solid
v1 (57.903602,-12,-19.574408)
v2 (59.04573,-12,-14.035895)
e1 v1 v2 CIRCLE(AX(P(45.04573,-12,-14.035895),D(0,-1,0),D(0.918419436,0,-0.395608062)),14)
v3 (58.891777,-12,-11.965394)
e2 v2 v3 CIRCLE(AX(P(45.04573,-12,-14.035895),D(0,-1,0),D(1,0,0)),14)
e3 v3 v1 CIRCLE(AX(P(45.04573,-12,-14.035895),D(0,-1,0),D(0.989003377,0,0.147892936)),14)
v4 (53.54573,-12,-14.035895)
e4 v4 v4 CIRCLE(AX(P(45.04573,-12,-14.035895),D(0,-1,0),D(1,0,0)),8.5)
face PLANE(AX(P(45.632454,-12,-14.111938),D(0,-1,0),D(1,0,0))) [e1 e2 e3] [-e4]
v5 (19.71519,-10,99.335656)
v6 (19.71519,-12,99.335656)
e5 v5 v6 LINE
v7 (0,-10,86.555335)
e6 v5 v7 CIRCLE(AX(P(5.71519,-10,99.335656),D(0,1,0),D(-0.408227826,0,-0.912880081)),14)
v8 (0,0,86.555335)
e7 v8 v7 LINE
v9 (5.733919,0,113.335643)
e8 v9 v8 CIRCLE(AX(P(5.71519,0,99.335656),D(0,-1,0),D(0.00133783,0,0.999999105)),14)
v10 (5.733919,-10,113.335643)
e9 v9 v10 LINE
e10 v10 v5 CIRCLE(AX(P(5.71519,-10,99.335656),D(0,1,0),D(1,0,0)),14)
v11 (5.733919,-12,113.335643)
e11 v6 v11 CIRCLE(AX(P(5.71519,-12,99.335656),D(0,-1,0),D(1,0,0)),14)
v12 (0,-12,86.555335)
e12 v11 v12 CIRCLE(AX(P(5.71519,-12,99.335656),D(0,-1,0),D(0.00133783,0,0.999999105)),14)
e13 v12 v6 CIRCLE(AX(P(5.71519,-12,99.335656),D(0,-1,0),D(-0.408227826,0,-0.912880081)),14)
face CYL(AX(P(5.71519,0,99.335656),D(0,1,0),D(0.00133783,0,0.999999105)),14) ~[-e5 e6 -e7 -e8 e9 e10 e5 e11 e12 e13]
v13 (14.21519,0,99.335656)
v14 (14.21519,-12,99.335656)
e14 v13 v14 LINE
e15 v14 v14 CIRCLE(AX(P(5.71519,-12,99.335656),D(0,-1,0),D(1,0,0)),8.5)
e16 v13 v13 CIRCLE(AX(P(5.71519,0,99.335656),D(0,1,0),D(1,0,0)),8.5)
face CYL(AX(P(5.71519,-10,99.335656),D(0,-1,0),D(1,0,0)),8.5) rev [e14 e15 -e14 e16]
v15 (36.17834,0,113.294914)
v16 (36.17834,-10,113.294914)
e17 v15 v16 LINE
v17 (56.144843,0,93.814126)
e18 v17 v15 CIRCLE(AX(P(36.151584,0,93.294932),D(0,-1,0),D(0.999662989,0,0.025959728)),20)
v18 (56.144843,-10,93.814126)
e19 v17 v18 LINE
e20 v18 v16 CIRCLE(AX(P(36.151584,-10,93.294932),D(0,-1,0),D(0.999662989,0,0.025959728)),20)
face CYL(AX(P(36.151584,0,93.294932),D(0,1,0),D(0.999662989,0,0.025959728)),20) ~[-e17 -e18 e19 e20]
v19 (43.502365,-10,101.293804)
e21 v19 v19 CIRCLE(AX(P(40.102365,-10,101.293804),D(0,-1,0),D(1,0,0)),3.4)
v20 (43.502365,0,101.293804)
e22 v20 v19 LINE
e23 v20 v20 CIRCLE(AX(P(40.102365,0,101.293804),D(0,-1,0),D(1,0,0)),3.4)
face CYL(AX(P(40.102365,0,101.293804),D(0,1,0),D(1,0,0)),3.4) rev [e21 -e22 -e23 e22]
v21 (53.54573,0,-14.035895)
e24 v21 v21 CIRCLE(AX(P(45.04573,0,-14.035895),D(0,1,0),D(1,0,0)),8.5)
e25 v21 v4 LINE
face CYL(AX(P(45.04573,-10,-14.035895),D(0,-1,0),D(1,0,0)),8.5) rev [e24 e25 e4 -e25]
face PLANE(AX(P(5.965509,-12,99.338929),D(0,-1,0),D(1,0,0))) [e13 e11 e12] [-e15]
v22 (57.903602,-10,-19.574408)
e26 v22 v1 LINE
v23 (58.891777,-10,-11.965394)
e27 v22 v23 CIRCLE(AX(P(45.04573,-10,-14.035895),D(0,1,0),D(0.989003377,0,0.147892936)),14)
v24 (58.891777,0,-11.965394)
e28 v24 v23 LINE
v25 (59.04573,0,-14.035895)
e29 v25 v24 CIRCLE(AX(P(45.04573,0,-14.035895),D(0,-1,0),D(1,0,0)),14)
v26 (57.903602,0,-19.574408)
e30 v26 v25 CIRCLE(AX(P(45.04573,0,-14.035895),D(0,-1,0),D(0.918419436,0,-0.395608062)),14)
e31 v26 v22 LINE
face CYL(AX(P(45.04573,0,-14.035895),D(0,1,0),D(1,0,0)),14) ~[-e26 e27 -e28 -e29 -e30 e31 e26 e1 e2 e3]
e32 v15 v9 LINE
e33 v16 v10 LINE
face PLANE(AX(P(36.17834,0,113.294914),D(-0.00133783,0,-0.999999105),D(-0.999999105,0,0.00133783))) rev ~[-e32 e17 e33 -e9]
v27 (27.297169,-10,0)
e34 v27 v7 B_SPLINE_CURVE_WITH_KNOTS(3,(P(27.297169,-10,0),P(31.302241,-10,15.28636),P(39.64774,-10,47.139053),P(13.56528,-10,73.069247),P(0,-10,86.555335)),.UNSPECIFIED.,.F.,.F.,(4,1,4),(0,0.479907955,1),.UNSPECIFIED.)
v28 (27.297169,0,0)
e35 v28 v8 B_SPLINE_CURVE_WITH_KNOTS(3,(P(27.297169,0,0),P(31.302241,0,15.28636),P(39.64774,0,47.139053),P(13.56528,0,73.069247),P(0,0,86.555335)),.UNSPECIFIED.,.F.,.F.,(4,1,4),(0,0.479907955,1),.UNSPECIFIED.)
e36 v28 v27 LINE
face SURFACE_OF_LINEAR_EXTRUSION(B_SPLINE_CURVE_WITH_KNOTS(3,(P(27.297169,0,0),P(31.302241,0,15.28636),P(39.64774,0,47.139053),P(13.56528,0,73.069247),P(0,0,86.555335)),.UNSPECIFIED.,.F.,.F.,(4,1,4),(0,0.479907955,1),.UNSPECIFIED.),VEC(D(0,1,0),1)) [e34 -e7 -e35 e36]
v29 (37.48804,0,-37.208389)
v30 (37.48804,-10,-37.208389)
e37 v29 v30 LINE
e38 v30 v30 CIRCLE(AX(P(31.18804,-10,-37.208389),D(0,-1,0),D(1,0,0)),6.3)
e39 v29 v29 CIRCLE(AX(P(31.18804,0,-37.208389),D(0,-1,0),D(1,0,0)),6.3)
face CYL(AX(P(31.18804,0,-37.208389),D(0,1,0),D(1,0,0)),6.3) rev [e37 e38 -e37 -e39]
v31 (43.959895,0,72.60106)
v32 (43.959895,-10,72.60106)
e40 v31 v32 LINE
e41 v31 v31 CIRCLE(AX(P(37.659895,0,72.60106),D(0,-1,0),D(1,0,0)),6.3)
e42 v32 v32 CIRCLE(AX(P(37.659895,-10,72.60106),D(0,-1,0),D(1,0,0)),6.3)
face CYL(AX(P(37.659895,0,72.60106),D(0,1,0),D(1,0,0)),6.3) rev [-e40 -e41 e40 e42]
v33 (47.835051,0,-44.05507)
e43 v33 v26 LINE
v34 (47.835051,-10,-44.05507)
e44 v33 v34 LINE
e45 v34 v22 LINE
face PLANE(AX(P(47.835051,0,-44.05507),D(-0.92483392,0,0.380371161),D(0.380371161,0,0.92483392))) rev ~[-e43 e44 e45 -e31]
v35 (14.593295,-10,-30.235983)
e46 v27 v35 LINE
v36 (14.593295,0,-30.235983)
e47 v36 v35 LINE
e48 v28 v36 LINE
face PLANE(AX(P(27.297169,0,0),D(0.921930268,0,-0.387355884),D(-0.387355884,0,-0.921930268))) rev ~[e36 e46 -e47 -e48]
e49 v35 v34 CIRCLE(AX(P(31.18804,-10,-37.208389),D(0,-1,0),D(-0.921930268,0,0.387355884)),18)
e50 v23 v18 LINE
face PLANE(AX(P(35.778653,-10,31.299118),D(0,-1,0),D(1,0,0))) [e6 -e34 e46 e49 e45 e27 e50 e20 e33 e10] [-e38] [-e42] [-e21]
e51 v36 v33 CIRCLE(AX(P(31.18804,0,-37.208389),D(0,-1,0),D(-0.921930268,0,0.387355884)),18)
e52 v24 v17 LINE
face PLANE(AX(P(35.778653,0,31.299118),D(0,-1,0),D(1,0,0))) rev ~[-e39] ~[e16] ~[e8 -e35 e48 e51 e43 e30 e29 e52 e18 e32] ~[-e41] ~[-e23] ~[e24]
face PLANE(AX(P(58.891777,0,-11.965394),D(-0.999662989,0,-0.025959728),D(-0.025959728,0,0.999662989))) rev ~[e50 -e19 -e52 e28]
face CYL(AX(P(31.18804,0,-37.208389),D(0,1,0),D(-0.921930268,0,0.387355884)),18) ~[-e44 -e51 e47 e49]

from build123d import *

# Parameters (mm, degrees)
F0_R     = 9
F0_R_2   = 3.4
F0_R_3   = 8.5
F0_R_4   = 6.3
F1_DEPTH = 10
F2_DEPTH = 12
F3_DEPTH = 10
F4_DEPTH = 10
F5_DEPTH = 10
F6_DEPTH = 12
F7_DEPTH = 10
F8_DEPTH = 10


# Not quite as in the source:
# - a feature names something its author has since deleted; it is built from what else it names


with BuildPart() as f1:
    # F0 (on Front) → F1 (new body)
    with BuildSketch(Plane.XZ):
        with BuildLine():
            ThreePointArc((57.9036016774, -19.5744080829), (31.1623185662, -12.2328702689), (58.8917768446, -11.9653941064))
            Line((58.8917768446, -11.9653941064), (56.1448434713, 93.81412645))
            ThreePointArc((56.1448434713, 93.81412645), (50.11852804, 107.6101149154), (36.1783402733, 113.2949139834))
            Line((36.1783402733, 113.2949139834), (5.7339191772, 113.3356434663))
            ThreePointArc((5.7339191772, 113.3356434663), (15.6213042052, 109.2285267967), (19.7151895633, 99.3356559948))
            ThreePointArc((19.7151895633, 99.3356559948), (13.3305472737, 87.5880465809), (0, 86.5553348621))
            add(Edge.make_bspline(
                [(27.2971690085, 0), (31.3022406236, 15.2863604375), (39.6477401648, 47.1390527935), (13.5652800367, 73.0692470789), (0, 86.5553348621)],
                knots=[0, 0, 0, 0, 0.4799079546, 1, 1, 1, 1], degree=3))
            Line((27.2971690085, 0), (14.5932951458, -30.2359827701))
            ThreePointArc((14.5932951458, -30.2359827701), (24.2784471497, -53.8293852547), (47.8350505361, -44.0550695737))
            Line((47.8350505361, -44.0550695737), (57.9036016774, -19.5744080829))
        make_face()
        with Locations((31.1880399704, -37.2083886825)):
            Circle(F0_R, mode=Mode.SUBTRACT)
        with Locations((37.6598948849, 72.601060337)):
            Circle(F0_R, mode=Mode.SUBTRACT)
        with Locations((40.1023646421, 101.2938035134)):
            Circle(F0_R_2, mode=Mode.SUBTRACT)
        with BuildLine():
            ThreePointArc((57.9036016774, -19.5744080829), (58.7572249195, -16.863419789), (59.0457295684, -14.0358952114))
            ThreePointArc((59.0457295684, -14.0358952114), (59.0071883365, -12.9977868034), (58.8917768446, -11.9653941064))
            ThreePointArc((58.8917768446, -11.9653941064), (31.1623185662, -12.2328702689), (57.9036016774, -19.5744080829))
        make_face()
        with Locations((45.0457295684, -14.0358952114)):
            Circle(F0_R_3, mode=Mode.SUBTRACT)
        with BuildLine():
            ThreePointArc((19.7151895633, 99.3356559948), (15.6213042052, 109.2285267967), (5.7339191772, 113.3356434663))
            ThreePointArc((5.7339191772, 113.3356434663), (-7.9745381996, 102.2667571151), (0, 86.5553348621))
            ThreePointArc((0, 86.5553348621), (13.3305472737, 87.5880465809), (19.7151895633, 99.3356559948))
        make_face()
        with Locations((5.7151895633, 99.3356559948)):
            Circle(F0_R_3, mode=Mode.SUBTRACT)
        with Locations((37.6598948849, 72.601060337)):
            Circle(F0_R)
        with Locations((37.6598948849, 72.601060337)):
            Circle(F0_R_4, mode=Mode.SUBTRACT)
        with Locations((31.1880399704, -37.2083886825)):
            Circle(F0_R)
        with Locations((31.1880399704, -37.2083886825)):
            Circle(F0_R_4, mode=Mode.SUBTRACT)
        with Locations((45.0457295684, -14.0358952114)):
            Circle(F0_R_3)
        with Locations((5.7151895633, 99.3356559948)):
            Circle(F0_R_3)
        with Locations((31.1880399704, -37.2083886825)):
            Circle(F0_R_4)
        with Locations((37.6598948849, 72.601060337)):
            Circle(F0_R_4)
        with Locations((40.1023646421, 101.2938035134)):
            Circle(F0_R_2)
    extrude(amount=F1_DEPTH)

    # F0 (on Front) → F2 (join)
    with BuildSketch(Plane.XZ):
        with BuildLine():
            ThreePointArc((19.7151895633, 99.3356559948), (15.6213042052, 109.2285267967), (5.7339191772, 113.3356434663))
            ThreePointArc((5.7339191772, 113.3356434663), (-7.9745381996, 102.2667571151), (0, 86.5553348621))
            ThreePointArc((0, 86.5553348621), (13.3305472737, 87.5880465809), (19.7151895633, 99.3356559948))
        make_face()
        with Locations((5.7151895633, 99.3356559948)):
            Circle(F0_R_3, mode=Mode.SUBTRACT)
    extrude(amount=F2_DEPTH)

    # F3 (cut): a face of the model
    f3_faces = [f1.faces().sort_by_distance(p)[0] for p in [
        (5.7151895633, -10, 99.3356559948),
    ]]
    extrude(f3_faces, amount=-F3_DEPTH, mode=Mode.SUBTRACT)

    # F0 (on Front) → F4 (cut)
    with BuildSketch(Plane.XZ):
        with Locations((40.1023646421, 101.2938035134)):
            Circle(F0_R_2)
    extrude(amount=F4_DEPTH, mode=Mode.SUBTRACT)

    # F0 (on Front) → F5 (cut)
    with BuildSketch(Plane.XZ):
        with Locations((37.6598948849, 72.601060337)):
            Circle(F0_R_4)
    extrude(amount=F5_DEPTH, mode=Mode.SUBTRACT)

    # F0 (on Front) → F6 (join)
    with BuildSketch(Plane.XZ):
        with BuildLine():
            ThreePointArc((57.9036016774, -19.5744080829), (58.7572249195, -16.863419789), (59.0457295684, -14.0358952114))
            ThreePointArc((59.0457295684, -14.0358952114), (59.0071883365, -12.9977868034), (58.8917768446, -11.9653941064))
            ThreePointArc((58.8917768446, -11.9653941064), (31.1623185662, -12.2328702689), (57.9036016774, -19.5744080829))
        make_face()
        with Locations((45.0457295684, -14.0358952114)):
            Circle(F0_R_3, mode=Mode.SUBTRACT)
    extrude(amount=F6_DEPTH)

    # F7 (cut): a face of the model
    f7_faces = [f1.faces().sort_by_distance(p)[0] for p in [
        (45.0457295684, -10, -14.0358952114),
    ]]
    extrude(f7_faces, amount=-F7_DEPTH, mode=Mode.SUBTRACT)

    # F0 (on Front) → F8 (cut)
    with BuildSketch(Plane.XZ):
        with Locations((31.1880399704, -37.2083886825)):
            Circle(F0_R_4)
    extrude(amount=F8_DEPTH, mode=Mode.SUBTRACT)


solid = f1.part
